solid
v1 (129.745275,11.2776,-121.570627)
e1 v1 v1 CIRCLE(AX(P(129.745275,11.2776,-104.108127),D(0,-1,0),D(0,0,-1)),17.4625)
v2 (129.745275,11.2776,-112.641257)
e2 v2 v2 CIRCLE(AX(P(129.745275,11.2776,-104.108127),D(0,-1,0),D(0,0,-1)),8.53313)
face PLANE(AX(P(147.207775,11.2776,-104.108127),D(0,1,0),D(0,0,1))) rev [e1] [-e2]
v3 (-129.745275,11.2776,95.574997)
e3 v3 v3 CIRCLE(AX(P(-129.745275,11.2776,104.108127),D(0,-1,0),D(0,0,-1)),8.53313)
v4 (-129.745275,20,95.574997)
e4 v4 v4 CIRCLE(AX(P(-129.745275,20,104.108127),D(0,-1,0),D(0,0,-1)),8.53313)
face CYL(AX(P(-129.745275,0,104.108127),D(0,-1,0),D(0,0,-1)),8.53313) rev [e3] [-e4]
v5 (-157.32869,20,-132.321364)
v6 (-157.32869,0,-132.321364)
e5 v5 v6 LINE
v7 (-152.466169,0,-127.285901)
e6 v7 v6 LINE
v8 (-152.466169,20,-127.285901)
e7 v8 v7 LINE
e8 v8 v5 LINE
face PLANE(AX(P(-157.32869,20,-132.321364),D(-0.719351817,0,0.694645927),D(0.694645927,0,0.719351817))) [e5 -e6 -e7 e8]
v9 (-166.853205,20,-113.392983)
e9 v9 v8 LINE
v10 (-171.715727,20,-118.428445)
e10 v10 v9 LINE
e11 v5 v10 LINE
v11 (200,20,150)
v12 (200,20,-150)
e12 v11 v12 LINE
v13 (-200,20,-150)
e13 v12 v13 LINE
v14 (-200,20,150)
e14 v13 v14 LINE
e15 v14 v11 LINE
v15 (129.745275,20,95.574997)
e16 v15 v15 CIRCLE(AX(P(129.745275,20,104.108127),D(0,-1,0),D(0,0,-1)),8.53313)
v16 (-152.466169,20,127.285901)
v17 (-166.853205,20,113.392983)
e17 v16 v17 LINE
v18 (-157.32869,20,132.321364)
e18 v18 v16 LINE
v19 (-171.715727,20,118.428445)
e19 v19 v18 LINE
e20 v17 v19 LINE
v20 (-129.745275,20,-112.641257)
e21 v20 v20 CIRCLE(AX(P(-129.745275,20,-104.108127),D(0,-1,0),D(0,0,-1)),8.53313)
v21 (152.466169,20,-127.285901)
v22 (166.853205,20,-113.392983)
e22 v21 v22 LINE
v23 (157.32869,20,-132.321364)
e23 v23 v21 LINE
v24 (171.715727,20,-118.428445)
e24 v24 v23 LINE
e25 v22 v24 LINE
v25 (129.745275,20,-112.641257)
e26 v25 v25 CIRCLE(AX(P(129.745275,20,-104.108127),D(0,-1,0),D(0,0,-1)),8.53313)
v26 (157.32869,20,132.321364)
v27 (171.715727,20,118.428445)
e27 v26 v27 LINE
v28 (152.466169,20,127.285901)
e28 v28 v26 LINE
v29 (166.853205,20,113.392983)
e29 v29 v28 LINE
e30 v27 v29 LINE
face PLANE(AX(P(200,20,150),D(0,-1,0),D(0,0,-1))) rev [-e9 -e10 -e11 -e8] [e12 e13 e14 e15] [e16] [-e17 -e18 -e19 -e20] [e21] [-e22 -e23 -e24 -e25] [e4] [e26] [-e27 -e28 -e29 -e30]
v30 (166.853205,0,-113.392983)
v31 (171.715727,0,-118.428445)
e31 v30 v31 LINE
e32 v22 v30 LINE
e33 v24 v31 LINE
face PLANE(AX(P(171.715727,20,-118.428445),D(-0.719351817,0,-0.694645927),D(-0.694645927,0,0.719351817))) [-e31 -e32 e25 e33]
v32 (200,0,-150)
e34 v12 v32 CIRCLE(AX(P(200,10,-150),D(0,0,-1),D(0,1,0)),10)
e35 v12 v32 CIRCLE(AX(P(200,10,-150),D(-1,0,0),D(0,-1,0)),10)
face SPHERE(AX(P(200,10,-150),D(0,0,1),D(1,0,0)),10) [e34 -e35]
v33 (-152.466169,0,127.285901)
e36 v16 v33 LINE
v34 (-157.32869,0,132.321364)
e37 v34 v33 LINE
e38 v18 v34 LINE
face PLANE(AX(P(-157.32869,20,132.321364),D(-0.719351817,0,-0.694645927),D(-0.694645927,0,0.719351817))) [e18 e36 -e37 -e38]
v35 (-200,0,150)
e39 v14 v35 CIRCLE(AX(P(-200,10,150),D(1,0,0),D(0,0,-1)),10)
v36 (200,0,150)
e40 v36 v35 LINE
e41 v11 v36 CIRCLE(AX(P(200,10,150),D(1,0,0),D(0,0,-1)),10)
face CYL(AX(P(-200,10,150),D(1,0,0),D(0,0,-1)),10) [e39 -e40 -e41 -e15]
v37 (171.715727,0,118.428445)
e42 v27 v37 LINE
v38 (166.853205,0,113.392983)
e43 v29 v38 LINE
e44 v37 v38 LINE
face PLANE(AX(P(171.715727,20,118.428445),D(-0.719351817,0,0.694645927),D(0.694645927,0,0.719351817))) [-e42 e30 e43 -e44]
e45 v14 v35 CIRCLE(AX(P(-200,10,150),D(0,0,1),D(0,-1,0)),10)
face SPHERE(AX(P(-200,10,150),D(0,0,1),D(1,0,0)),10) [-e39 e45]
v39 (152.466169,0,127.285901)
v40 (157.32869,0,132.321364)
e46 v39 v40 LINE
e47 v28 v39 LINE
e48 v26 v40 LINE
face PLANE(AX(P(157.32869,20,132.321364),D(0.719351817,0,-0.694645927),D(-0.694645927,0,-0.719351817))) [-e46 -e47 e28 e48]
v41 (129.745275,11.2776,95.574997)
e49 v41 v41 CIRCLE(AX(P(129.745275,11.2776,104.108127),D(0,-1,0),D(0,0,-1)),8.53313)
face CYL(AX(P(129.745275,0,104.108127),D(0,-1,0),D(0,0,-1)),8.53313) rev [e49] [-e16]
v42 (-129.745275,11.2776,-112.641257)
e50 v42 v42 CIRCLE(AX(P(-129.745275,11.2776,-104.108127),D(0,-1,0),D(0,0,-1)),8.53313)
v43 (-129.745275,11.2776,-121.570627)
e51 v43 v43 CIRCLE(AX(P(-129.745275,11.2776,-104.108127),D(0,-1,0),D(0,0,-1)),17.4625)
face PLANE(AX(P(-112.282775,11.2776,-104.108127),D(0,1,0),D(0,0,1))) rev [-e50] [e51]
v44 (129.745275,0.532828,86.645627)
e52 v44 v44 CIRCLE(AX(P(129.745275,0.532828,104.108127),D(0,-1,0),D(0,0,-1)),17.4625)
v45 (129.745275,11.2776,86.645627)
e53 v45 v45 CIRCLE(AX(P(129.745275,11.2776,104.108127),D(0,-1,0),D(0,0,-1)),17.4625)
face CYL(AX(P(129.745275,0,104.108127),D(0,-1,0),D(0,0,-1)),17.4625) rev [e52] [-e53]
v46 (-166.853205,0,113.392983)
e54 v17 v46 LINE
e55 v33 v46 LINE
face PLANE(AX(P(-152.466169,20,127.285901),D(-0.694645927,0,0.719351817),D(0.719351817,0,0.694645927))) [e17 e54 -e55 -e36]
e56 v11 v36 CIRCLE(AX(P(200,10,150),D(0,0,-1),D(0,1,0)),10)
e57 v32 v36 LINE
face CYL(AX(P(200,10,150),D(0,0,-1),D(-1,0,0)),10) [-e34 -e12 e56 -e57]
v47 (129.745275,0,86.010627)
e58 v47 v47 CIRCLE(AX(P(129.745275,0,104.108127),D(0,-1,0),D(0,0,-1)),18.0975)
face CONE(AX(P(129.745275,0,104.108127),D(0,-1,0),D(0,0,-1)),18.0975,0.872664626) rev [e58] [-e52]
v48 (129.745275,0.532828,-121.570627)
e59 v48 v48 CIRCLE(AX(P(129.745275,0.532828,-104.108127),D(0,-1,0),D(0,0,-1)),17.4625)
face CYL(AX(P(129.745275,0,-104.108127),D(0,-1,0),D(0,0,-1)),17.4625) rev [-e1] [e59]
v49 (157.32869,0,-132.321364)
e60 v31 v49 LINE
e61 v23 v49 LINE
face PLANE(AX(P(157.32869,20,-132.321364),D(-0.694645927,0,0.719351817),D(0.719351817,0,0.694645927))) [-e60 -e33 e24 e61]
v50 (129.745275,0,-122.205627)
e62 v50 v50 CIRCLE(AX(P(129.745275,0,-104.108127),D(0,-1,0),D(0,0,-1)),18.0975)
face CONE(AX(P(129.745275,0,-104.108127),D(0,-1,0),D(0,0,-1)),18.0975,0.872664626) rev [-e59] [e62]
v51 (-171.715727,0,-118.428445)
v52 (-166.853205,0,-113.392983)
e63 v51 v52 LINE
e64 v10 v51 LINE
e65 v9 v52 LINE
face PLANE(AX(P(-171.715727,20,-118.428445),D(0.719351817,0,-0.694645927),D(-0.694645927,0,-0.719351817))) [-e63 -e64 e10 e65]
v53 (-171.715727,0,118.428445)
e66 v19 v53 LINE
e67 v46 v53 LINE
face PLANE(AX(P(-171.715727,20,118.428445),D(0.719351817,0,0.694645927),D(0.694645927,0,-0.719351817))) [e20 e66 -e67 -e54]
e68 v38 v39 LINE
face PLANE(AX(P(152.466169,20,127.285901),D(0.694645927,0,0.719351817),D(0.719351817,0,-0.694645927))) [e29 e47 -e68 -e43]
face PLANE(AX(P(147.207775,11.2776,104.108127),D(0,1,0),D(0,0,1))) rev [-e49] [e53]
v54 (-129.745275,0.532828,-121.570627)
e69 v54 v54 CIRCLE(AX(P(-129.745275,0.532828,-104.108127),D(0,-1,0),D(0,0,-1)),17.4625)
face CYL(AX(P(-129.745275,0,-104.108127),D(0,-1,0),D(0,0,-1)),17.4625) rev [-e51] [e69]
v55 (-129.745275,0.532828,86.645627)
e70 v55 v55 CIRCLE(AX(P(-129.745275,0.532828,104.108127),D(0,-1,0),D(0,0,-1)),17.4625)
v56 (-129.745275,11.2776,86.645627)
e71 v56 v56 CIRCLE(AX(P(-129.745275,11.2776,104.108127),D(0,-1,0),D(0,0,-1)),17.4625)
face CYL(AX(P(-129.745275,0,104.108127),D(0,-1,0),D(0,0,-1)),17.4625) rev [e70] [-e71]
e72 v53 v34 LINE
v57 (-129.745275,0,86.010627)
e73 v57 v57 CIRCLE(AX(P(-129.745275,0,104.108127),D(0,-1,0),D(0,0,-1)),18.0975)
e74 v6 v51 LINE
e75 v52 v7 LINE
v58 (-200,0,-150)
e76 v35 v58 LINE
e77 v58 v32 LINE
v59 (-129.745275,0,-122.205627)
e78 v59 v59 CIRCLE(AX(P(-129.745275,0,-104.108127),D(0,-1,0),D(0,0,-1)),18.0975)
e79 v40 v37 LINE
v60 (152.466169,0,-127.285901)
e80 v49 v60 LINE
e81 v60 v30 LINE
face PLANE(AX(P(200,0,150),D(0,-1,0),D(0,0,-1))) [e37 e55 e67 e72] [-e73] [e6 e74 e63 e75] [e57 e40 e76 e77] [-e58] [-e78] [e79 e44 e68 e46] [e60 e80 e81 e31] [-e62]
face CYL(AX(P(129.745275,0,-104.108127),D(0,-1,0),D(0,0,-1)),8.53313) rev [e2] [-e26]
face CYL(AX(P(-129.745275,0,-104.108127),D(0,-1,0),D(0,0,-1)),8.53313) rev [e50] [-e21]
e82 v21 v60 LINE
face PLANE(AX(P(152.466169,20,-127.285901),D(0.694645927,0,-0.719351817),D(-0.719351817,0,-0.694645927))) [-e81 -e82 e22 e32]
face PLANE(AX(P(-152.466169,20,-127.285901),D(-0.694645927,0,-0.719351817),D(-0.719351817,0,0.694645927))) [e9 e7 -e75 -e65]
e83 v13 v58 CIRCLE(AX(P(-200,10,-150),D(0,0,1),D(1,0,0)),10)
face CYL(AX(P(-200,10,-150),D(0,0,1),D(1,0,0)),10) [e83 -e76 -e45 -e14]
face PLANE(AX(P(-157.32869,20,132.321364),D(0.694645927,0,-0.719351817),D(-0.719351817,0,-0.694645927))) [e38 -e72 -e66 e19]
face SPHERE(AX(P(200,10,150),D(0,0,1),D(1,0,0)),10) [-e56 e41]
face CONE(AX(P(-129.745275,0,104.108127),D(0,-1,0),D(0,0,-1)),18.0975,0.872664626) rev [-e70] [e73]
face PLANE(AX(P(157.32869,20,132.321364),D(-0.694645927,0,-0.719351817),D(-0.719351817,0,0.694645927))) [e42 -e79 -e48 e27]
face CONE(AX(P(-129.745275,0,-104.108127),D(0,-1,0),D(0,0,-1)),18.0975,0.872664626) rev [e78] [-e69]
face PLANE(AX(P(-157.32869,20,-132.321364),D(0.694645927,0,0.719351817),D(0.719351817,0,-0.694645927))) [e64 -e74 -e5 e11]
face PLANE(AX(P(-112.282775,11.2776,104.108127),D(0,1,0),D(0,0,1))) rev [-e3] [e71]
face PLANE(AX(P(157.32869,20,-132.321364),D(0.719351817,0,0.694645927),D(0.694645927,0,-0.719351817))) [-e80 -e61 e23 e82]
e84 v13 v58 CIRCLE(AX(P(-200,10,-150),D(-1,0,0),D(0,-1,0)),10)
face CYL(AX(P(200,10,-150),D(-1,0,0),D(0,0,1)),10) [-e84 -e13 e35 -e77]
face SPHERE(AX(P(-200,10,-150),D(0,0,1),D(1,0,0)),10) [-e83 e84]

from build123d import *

# Parameters (mm, degrees)
EXTRUDE_1_DEPTH              = 20
HOLE_WIZARD_5_8_1_AT_2_COUNT = 2
HOLE_WIZARD_5_8_1_AT_2_PITCH = 259.490550386
HOLE_WIZARD_5_8_1_AT_3_COUNT = 2
HOLE_WIZARD_5_8_1_AT_3_PITCH = 208.21625411
HOLE_WIZARD_5_8_1_AT_4_COUNT = 2
HOLE_WIZARD_5_8_1_AT_4_PITCH = 332.700096506
FILLET_1_R                   = 10


with BuildPart() as part:
    # 草图2 → 凸台-拉伸1 (new body)
    with BuildSketch(Plane(origin=(0, 0, 0), x_dir=(1, 0, 0), z_dir=(0, 1, 0))):
        with BuildLine():
            Line((-200, 160), (200, 160))
            ThreePointArc((200, 160), (207.071067812, 157.071067812), (210, 150))
            Line((210, 150), (210, 0))
            Line((210, 0), (210, -150))
            ThreePointArc((210, -150), (207.071067812, -157.071067812), (200, -160))
            Line((200, -160), (-200, -160))
            ThreePointArc((-200, -160), (-207.071067812, -157.071067812), (-210, -150))
            Line((-210, -150), (-210, 0))
            Line((-210, 0), (-210, 150))
            ThreePointArc((-210, 150), (-207.071067812, 157.071067812), (-200, 160))
        make_face()
        Polygon((-157.328690373, 132.321363833), (-171.715726709, 118.428445296), (-166.853205221, 113.392982578), (-152.466168885, 127.285901115), align=None, mode=Mode.SUBTRACT)
        Polygon((-171.715726709, -118.428445296), (-166.853205221, -113.392982578), (-152.466168885, -127.285901115), (-157.328690373, -132.321363833), align=None, mode=Mode.SUBTRACT)
        Polygon((157.328690373, -132.321363833), (171.715726709, -118.428445296), (166.853205221, -113.392982578), (152.466168885, -127.285901115), align=None, mode=Mode.SUBTRACT)
        Polygon((171.715726709, 118.428445296), (166.853205221, 113.392982578), (152.466168885, 127.285901115), (157.328690373, 132.321363833), align=None, mode=Mode.SUBTRACT)
    extrude(amount=EXTRUDE_1_DEPTH)

    # 草图16 → 5/8 六角头螺钉的柱形沉头孔1 (revolve, cut)
    with BuildSketch(Plane(origin=(-129.745275193, 0, 104.108127055), x_dir=(0, 0, -1), z_dir=(1, 0, 0))):
        Polygon((0, 0), (0, 20), (8.53313, 20), (8.53313, 11.2776), (17.4625, 11.2776), (17.4625, 0.532828266), (18.0975, 0), align=None)
    hole_wizard_5_8_1 = revolve(axis=Axis((-129.745275193, -6.35, 104.108127055), (0, 1, 0)), mode=Mode.SUBTRACT)

    # 5/8 六角头螺钉的柱形沉头孔1 at 2: 5/8 六角头螺钉的柱形沉头孔1 ×2
    with Locations(*[(i * HOLE_WIZARD_5_8_1_AT_2_PITCH, 0, 0) for i in range(1, HOLE_WIZARD_5_8_1_AT_2_COUNT)]):
        add(hole_wizard_5_8_1, mode=Mode.SUBTRACT)

    # 5/8 六角头螺钉的柱形沉头孔1 at 3: 5/8 六角头螺钉的柱形沉头孔1 ×2
    with Locations(*[(0, 0, -i * HOLE_WIZARD_5_8_1_AT_3_PITCH) for i in range(1, HOLE_WIZARD_5_8_1_AT_3_COUNT)]):
        add(hole_wizard_5_8_1, mode=Mode.SUBTRACT)

    # 5/8 六角头螺钉的柱形沉头孔1 at 4: 5/8 六角头螺钉的柱形沉头孔1 ×2
    with Locations(*[Vector(0.779953336687125, 0, -0.6258376727160331) * (i * HOLE_WIZARD_5_8_1_AT_4_PITCH) for i in range(1, HOLE_WIZARD_5_8_1_AT_4_COUNT)]):
        add(hole_wizard_5_8_1, mode=Mode.SUBTRACT)

    # 圆角1
    fillet_1_edges = [part.edges().sort_by_distance(p)[0] for p in [
        (-210, 0, 0),
        (0, 0, -160),
        (210, 0, 0),
        (0, 20, -160),
        (-210, 20, 0),
        (0, 20, 160),
        (210, 20, 0),
        (0, 0, 160),
        (207.071067812, 20, -157.071067812),
        (-207.071067812, 0, 157.071067812),
        (-207.071067812, 0, -157.071067812),
        (207.071067812, 20, 157.071067812),
    ]]
    fillet(fillet_1_edges, radius=FILLET_1_R - 0.0001)  # a hair under: the kernel refuses the full size


solid = part.part
